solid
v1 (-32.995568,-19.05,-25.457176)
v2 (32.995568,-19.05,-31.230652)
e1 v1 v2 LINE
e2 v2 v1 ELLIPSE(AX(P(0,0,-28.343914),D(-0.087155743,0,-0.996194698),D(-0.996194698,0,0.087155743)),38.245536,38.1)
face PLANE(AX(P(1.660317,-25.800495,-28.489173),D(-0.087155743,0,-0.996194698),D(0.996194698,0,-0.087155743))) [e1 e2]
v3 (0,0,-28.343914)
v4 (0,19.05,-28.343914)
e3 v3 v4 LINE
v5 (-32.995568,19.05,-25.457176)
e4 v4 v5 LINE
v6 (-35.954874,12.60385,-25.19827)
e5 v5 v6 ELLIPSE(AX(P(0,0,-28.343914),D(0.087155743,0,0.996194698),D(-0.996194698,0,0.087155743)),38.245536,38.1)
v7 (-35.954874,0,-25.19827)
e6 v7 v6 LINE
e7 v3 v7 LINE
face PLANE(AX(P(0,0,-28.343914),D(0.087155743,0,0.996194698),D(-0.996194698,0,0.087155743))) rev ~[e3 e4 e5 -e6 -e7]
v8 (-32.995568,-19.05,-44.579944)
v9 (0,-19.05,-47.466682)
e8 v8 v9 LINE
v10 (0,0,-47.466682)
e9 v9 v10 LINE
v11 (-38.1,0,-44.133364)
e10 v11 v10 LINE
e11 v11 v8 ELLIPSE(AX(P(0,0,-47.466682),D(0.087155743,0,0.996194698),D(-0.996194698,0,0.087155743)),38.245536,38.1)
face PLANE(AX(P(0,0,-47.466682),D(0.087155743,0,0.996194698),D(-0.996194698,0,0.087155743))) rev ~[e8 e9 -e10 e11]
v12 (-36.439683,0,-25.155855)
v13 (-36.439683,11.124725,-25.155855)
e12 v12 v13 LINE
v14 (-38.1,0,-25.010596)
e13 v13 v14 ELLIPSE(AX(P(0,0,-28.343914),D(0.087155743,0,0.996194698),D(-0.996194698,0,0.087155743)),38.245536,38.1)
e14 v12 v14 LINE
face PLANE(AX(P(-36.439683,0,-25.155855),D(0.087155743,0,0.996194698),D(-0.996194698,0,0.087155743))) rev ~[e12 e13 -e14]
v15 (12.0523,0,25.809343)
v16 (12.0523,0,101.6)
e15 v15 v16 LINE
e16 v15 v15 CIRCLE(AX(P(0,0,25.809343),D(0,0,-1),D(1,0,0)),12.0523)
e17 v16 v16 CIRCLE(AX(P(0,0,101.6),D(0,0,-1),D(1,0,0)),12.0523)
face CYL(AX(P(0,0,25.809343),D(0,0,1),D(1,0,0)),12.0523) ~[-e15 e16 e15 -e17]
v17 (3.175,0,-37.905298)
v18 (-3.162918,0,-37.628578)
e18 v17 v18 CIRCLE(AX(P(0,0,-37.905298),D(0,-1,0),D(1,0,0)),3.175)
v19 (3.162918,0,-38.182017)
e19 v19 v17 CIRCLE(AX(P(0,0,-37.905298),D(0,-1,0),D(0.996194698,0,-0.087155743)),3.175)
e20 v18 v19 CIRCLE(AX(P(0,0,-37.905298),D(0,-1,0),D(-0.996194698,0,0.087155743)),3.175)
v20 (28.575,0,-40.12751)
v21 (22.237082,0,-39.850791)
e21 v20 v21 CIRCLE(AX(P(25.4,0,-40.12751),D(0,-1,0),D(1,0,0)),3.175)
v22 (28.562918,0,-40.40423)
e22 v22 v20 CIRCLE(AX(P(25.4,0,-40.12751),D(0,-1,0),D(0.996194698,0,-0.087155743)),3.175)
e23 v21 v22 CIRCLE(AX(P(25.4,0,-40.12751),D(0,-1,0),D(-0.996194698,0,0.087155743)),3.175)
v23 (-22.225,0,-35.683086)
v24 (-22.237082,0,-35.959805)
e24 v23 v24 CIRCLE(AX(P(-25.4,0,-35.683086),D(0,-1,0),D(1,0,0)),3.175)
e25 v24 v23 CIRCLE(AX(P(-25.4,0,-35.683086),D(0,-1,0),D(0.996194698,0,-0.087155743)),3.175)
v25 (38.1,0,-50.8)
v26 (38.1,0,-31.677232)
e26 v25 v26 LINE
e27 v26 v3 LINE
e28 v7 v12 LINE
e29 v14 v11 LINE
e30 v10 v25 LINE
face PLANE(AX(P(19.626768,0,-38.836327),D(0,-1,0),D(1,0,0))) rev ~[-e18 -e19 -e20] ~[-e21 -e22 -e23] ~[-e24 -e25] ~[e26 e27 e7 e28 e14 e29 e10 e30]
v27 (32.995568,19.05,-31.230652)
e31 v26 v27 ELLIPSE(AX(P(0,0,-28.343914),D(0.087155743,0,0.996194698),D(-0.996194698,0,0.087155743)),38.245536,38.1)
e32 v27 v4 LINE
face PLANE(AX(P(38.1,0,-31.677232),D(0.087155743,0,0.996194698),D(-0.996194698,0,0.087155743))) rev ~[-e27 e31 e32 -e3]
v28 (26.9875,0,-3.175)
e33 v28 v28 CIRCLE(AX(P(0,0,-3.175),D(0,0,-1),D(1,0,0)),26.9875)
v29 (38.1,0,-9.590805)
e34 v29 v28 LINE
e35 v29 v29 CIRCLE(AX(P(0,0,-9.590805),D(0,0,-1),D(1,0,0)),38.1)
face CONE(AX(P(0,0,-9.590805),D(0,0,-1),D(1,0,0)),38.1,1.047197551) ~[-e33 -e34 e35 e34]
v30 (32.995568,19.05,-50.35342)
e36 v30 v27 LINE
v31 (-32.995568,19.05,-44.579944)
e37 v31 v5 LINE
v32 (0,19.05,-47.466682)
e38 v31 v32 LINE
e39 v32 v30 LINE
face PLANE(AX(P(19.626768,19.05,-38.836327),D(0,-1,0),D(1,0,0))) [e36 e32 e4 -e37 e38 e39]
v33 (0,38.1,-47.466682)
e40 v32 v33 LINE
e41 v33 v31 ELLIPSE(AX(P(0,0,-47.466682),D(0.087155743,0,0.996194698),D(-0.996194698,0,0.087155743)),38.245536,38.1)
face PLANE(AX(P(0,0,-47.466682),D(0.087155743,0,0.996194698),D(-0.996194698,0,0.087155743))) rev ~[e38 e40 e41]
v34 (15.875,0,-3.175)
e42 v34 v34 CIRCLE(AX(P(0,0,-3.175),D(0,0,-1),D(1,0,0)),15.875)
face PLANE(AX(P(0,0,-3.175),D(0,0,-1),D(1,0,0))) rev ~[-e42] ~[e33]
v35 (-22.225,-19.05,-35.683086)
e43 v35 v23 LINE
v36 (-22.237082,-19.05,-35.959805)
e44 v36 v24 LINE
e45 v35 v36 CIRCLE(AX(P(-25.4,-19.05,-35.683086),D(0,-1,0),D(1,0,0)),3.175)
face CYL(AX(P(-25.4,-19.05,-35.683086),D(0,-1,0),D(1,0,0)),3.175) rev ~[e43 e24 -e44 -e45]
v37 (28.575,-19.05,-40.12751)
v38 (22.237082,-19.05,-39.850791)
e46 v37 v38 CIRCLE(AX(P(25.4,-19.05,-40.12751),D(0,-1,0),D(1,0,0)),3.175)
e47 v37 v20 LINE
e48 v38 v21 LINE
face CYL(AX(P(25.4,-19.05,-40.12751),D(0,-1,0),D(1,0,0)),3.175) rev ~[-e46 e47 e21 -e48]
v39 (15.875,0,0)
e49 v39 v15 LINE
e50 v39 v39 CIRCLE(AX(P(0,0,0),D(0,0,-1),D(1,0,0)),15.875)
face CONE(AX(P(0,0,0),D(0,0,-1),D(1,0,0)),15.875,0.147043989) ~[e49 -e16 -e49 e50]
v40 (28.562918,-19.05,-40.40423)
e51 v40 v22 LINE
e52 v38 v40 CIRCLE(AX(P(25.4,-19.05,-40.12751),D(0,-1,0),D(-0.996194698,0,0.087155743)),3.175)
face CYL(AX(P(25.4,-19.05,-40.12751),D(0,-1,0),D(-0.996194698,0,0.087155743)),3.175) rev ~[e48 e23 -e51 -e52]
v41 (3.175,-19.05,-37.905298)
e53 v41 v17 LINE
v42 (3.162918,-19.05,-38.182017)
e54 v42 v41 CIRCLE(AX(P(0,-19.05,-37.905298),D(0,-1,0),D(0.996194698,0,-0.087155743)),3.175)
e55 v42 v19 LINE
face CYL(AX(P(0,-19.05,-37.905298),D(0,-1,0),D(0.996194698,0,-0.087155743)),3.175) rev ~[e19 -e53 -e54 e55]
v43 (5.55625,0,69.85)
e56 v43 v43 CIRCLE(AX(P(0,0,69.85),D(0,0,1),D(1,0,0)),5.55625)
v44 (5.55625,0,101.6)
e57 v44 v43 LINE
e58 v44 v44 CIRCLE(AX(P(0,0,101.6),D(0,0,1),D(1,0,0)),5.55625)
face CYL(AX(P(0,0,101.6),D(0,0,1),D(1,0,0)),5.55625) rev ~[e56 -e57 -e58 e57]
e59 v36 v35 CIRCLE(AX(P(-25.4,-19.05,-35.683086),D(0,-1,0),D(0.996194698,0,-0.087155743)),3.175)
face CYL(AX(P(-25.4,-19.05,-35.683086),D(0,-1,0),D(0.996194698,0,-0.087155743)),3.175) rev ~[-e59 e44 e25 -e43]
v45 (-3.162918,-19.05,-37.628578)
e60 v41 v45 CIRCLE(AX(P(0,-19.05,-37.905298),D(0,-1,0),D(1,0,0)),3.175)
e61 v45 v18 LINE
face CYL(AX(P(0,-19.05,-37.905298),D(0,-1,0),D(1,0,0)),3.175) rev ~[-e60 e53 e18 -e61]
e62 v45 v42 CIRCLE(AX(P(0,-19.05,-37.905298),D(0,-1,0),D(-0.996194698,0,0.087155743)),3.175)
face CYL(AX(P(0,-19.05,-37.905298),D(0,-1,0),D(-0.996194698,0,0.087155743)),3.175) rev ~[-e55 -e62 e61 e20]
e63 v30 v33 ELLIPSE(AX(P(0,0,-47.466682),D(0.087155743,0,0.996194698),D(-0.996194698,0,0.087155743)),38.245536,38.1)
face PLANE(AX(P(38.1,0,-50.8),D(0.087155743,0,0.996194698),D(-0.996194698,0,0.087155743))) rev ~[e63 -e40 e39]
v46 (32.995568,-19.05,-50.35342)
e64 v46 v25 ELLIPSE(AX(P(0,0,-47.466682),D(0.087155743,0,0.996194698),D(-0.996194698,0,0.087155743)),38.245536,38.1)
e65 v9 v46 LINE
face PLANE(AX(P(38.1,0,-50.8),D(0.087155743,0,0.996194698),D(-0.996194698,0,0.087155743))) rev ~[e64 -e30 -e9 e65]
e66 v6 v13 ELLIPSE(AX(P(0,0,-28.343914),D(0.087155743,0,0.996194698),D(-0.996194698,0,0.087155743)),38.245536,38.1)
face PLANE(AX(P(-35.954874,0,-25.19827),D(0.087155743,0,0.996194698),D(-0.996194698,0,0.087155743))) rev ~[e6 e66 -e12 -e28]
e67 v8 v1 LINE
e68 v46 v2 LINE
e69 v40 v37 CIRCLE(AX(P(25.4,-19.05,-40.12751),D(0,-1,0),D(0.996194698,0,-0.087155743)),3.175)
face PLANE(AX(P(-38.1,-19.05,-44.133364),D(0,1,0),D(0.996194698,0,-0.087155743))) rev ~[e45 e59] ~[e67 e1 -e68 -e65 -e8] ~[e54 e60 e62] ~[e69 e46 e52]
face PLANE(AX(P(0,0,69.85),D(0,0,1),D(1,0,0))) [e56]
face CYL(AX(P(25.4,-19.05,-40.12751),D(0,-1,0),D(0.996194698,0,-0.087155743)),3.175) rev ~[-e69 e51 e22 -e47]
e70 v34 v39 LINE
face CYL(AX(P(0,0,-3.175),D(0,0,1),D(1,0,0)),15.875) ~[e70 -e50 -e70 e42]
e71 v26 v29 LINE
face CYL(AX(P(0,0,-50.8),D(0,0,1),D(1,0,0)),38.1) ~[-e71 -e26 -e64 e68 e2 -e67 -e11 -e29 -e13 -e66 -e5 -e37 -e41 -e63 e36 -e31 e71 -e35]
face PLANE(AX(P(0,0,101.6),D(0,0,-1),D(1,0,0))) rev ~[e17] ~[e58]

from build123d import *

# Parameters (mm, degrees)
F0_W     = 9.525
F0_H     = 50.8
F2_DEPTH = 38.1
F3_DEPTH = 19.05
F5_DEPTH = 19.05
F7_DEPTH = 19.05
F8_R     = 5.55625
F9_DEPTH = 31.75


with BuildPart() as f1:
    # F0 (on Front) → F1 (revolve)
    with BuildSketch(Plane.XZ):
        with Locations((4.7625, 25.4)):
            Rectangle(F0_W, F0_H)
        Polygon((0, 101.6), (0, 50.8), (9.525, 50.8), (9.525, 0), (15.875, 0), (12.0523, 25.8093433608), (12.0523, 101.6), align=None)
        Polygon((38.1, -31.4561230436), (0, -24.7380650786), (0, -28.3439140145), (38.1, -31.6772320948), align=None)
        Polygon((38.1, -31.6772320948), (0, -28.3439140145), (0, -44.081942035), (38.1, -50.8), align=None)
        Polygon((38.1, -50.8), (0, -44.081942035), (0, -47.4666819197), align=None)
        Polygon((38.1, -50.8), (0, -47.4666819197), (0, -50.8), align=None)
        Polygon((9.525, 0), (0, 0), (0, -24.7380650786), (38.1, -31.4561230436), (38.1, -9.5908048664), (26.9875, -3.175), (15.875, -3.175), (15.875, 0), align=None)
    revolve(axis=Axis((0, 0, -25.4), (0, 0, -1)))

    # F0 (on Front) → F2 (cut, symmetric)
    with BuildSketch(Plane.XZ):
        Polygon((0, -50.8), (0, -47.4666819197), (-38.1, -44.1333638393), (-38.1, -50.8), align=None)
        Polygon((38.1, -50.8), (0, -47.4666819197), (0, -50.8), align=None)
    extrude(amount=F2_DEPTH, both=True, mode=Mode.SUBTRACT)

    # F0 (on Front) → F3 (cut)
    with BuildSketch(Plane.XZ):
        Polygon((38.1, -31.6772320948), (0, -28.3439140145), (0, -44.081942035), (38.1, -50.8), align=None)
        Polygon((0, -44.081942035), (0, -28.3439140145), (-35.954874027, -25.1982701386), (-36.9244921743, -30.6972479093), (-37.5167449121, -37.4667276786), align=None)
        Polygon((0, -47.4666819197), (0, -44.081942035), (-37.5167449121, -37.4667276786), (-38.1, -44.1333638393), align=None)
        Polygon((38.1, -50.8), (0, -44.081942035), (0, -47.4666819197), align=None)
        Polygon((-36.9244921743, -30.6972479093), (-35.954874027, -25.1982701386), (-36.4396831007, -25.1558548407), align=None)
        Polygon((-38.1, -37.36388407), (-36.9244921743, -30.6972479093), (-36.4396831007, -25.1558548407), (-38.1, -25.0105959341), align=None)
        Polygon((-38.1, -37.36388407), (-37.5167449121, -37.4667276786), (-36.9244921743, -30.6972479093), align=None)
        Polygon((-38.1, -44.1333638393), (-37.5167449121, -37.4667276786), (-38.1, -37.36388407), align=None)
    extrude(amount=-F3_DEPTH, mode=Mode.SUBTRACT)

    # F4 (on face) → F5 (cut)
    with BuildSketch(Plane(origin=(-4.1212514076, 0, -47.106119142), x_dir=(0.9961946981, 0, -0.0871557427), z_dir=(-0.0871557427, 0, -0.9961946981))):
        with BuildLine():
            Line((-28.9846116747, 19.05), (4.5792120209, 19.05))
            Line((4.5792120209, 19.05), (37.2585995116, 19.05))
            add(Edge.make_bspline(
                [(4.1369939185, 38.1), (26.2180643139, 38.1), (37.2585995116, 19.05)],
                knots=[1.5707963268, 1.5707963268, 1.5707963268, 2.6058232788, 2.6058232788, 2.6058232788], degree=2, weights=[1, 0.8070072037, 0.8683475024]))
            add(Edge.make_bspline(
                [(-28.9846116747, 19.05), (-17.944076477, 38.1), (4.1369939185, 38.1)],
                knots=[0.5357693748, 0.5357693748, 0.5357693748, 1.5707963268, 1.5707963268, 1.5707963268], degree=2, weights=[0.8683475024, 0.8070072037, 1]))
        make_face()
        with BuildLine():
            Line((-34.1085418919, 19.05), (-28.9846116747, 19.05))
            add(Edge.make_bspline(
                [(-28.9846116747, 19.05), (-17.944076477, 38.1), (4.1369939185, 38.1)],
                knots=[0.5357693748, 0.5357693748, 0.5357693748, 1.5707963268, 1.5707963268, 1.5707963268], degree=2, weights=[0.8683475024, 0.8070072037, 1]))
            Line((4.1369939185, 38.1), (-34.1085418919, 38.1365224015))
            Line((-34.1085418919, 38.1365224015), (-34.1085418919, 19.05))
        make_face()
    extrude(amount=-F5_DEPTH, mode=Mode.SUBTRACT)

    # F6 (on face) → F7 (cut)
    with BuildSketch(Plane.XZ.offset(19.05)):
        with BuildLine():
            Line((3.1629181664, -38.1820174503), (-3.1629181664, -37.6285784838))
            ThreePointArc((-3.1629181664, -37.6285784838), (-0.2767194832, -41.0682161335), (3.1629181664, -38.1820174503))
        make_face()
        with BuildLine():
            ThreePointArc((3.175, -37.9052979671), (0.1384915549, -34.7333198635), (-3.1629181664, -37.6285784838))
            Line((-3.1629181664, -37.6285784838), (3.1629181664, -38.1820174503))
            ThreePointArc((3.1629181664, -38.1820174503), (3.1719781035, -38.0437895219), (3.175, -37.9052979671))
        make_face()
        with BuildLine():
            ThreePointArc((-22.225, -35.6830859135), (-25.2615084451, -32.51110781), (-28.5629181664, -35.4063664303))
            Line((-28.5629181664, -35.4063664303), (-22.2370818336, -35.9598053967))
            ThreePointArc((-22.2370818336, -35.9598053967), (-22.2280218965, -35.8215774684), (-22.225, -35.6830859135))
        make_face()
        with BuildLine():
            Line((-22.2370818336, -35.9598053967), (-28.5629181664, -35.4063664303))
            ThreePointArc((-28.5629181664, -35.4063664303), (-25.6767194832, -38.8460040799), (-22.2370818336, -35.9598053967))
        make_face()
        with BuildLine():
            ThreePointArc((22.2370818336, -39.8507905374), (25.1232805168, -43.2904281871), (28.5629181664, -40.4042295038))
            Line((28.5629181664, -40.4042295038), (22.2370818336, -39.8507905374))
        make_face()
        with BuildLine():
            Line((22.2370818336, -39.8507905374), (28.5629181664, -40.4042295038))
            ThreePointArc((28.5629181664, -40.4042295038), (28.5719781035, -40.2660015755), (28.575, -40.1275100206))
            ThreePointArc((28.575, -40.1275100206), (25.5384915549, -36.9555319171), (22.2370818336, -39.8507905374))
        make_face()
    extrude(amount=-F7_DEPTH, mode=Mode.SUBTRACT)

    # F8 (on face) → F9 (cut)
    with BuildSketch(Plane.XY.offset(101.6)):
        Circle(F8_R)
    extrude(amount=-F9_DEPTH, mode=Mode.SUBTRACT)


solid = f1.part
